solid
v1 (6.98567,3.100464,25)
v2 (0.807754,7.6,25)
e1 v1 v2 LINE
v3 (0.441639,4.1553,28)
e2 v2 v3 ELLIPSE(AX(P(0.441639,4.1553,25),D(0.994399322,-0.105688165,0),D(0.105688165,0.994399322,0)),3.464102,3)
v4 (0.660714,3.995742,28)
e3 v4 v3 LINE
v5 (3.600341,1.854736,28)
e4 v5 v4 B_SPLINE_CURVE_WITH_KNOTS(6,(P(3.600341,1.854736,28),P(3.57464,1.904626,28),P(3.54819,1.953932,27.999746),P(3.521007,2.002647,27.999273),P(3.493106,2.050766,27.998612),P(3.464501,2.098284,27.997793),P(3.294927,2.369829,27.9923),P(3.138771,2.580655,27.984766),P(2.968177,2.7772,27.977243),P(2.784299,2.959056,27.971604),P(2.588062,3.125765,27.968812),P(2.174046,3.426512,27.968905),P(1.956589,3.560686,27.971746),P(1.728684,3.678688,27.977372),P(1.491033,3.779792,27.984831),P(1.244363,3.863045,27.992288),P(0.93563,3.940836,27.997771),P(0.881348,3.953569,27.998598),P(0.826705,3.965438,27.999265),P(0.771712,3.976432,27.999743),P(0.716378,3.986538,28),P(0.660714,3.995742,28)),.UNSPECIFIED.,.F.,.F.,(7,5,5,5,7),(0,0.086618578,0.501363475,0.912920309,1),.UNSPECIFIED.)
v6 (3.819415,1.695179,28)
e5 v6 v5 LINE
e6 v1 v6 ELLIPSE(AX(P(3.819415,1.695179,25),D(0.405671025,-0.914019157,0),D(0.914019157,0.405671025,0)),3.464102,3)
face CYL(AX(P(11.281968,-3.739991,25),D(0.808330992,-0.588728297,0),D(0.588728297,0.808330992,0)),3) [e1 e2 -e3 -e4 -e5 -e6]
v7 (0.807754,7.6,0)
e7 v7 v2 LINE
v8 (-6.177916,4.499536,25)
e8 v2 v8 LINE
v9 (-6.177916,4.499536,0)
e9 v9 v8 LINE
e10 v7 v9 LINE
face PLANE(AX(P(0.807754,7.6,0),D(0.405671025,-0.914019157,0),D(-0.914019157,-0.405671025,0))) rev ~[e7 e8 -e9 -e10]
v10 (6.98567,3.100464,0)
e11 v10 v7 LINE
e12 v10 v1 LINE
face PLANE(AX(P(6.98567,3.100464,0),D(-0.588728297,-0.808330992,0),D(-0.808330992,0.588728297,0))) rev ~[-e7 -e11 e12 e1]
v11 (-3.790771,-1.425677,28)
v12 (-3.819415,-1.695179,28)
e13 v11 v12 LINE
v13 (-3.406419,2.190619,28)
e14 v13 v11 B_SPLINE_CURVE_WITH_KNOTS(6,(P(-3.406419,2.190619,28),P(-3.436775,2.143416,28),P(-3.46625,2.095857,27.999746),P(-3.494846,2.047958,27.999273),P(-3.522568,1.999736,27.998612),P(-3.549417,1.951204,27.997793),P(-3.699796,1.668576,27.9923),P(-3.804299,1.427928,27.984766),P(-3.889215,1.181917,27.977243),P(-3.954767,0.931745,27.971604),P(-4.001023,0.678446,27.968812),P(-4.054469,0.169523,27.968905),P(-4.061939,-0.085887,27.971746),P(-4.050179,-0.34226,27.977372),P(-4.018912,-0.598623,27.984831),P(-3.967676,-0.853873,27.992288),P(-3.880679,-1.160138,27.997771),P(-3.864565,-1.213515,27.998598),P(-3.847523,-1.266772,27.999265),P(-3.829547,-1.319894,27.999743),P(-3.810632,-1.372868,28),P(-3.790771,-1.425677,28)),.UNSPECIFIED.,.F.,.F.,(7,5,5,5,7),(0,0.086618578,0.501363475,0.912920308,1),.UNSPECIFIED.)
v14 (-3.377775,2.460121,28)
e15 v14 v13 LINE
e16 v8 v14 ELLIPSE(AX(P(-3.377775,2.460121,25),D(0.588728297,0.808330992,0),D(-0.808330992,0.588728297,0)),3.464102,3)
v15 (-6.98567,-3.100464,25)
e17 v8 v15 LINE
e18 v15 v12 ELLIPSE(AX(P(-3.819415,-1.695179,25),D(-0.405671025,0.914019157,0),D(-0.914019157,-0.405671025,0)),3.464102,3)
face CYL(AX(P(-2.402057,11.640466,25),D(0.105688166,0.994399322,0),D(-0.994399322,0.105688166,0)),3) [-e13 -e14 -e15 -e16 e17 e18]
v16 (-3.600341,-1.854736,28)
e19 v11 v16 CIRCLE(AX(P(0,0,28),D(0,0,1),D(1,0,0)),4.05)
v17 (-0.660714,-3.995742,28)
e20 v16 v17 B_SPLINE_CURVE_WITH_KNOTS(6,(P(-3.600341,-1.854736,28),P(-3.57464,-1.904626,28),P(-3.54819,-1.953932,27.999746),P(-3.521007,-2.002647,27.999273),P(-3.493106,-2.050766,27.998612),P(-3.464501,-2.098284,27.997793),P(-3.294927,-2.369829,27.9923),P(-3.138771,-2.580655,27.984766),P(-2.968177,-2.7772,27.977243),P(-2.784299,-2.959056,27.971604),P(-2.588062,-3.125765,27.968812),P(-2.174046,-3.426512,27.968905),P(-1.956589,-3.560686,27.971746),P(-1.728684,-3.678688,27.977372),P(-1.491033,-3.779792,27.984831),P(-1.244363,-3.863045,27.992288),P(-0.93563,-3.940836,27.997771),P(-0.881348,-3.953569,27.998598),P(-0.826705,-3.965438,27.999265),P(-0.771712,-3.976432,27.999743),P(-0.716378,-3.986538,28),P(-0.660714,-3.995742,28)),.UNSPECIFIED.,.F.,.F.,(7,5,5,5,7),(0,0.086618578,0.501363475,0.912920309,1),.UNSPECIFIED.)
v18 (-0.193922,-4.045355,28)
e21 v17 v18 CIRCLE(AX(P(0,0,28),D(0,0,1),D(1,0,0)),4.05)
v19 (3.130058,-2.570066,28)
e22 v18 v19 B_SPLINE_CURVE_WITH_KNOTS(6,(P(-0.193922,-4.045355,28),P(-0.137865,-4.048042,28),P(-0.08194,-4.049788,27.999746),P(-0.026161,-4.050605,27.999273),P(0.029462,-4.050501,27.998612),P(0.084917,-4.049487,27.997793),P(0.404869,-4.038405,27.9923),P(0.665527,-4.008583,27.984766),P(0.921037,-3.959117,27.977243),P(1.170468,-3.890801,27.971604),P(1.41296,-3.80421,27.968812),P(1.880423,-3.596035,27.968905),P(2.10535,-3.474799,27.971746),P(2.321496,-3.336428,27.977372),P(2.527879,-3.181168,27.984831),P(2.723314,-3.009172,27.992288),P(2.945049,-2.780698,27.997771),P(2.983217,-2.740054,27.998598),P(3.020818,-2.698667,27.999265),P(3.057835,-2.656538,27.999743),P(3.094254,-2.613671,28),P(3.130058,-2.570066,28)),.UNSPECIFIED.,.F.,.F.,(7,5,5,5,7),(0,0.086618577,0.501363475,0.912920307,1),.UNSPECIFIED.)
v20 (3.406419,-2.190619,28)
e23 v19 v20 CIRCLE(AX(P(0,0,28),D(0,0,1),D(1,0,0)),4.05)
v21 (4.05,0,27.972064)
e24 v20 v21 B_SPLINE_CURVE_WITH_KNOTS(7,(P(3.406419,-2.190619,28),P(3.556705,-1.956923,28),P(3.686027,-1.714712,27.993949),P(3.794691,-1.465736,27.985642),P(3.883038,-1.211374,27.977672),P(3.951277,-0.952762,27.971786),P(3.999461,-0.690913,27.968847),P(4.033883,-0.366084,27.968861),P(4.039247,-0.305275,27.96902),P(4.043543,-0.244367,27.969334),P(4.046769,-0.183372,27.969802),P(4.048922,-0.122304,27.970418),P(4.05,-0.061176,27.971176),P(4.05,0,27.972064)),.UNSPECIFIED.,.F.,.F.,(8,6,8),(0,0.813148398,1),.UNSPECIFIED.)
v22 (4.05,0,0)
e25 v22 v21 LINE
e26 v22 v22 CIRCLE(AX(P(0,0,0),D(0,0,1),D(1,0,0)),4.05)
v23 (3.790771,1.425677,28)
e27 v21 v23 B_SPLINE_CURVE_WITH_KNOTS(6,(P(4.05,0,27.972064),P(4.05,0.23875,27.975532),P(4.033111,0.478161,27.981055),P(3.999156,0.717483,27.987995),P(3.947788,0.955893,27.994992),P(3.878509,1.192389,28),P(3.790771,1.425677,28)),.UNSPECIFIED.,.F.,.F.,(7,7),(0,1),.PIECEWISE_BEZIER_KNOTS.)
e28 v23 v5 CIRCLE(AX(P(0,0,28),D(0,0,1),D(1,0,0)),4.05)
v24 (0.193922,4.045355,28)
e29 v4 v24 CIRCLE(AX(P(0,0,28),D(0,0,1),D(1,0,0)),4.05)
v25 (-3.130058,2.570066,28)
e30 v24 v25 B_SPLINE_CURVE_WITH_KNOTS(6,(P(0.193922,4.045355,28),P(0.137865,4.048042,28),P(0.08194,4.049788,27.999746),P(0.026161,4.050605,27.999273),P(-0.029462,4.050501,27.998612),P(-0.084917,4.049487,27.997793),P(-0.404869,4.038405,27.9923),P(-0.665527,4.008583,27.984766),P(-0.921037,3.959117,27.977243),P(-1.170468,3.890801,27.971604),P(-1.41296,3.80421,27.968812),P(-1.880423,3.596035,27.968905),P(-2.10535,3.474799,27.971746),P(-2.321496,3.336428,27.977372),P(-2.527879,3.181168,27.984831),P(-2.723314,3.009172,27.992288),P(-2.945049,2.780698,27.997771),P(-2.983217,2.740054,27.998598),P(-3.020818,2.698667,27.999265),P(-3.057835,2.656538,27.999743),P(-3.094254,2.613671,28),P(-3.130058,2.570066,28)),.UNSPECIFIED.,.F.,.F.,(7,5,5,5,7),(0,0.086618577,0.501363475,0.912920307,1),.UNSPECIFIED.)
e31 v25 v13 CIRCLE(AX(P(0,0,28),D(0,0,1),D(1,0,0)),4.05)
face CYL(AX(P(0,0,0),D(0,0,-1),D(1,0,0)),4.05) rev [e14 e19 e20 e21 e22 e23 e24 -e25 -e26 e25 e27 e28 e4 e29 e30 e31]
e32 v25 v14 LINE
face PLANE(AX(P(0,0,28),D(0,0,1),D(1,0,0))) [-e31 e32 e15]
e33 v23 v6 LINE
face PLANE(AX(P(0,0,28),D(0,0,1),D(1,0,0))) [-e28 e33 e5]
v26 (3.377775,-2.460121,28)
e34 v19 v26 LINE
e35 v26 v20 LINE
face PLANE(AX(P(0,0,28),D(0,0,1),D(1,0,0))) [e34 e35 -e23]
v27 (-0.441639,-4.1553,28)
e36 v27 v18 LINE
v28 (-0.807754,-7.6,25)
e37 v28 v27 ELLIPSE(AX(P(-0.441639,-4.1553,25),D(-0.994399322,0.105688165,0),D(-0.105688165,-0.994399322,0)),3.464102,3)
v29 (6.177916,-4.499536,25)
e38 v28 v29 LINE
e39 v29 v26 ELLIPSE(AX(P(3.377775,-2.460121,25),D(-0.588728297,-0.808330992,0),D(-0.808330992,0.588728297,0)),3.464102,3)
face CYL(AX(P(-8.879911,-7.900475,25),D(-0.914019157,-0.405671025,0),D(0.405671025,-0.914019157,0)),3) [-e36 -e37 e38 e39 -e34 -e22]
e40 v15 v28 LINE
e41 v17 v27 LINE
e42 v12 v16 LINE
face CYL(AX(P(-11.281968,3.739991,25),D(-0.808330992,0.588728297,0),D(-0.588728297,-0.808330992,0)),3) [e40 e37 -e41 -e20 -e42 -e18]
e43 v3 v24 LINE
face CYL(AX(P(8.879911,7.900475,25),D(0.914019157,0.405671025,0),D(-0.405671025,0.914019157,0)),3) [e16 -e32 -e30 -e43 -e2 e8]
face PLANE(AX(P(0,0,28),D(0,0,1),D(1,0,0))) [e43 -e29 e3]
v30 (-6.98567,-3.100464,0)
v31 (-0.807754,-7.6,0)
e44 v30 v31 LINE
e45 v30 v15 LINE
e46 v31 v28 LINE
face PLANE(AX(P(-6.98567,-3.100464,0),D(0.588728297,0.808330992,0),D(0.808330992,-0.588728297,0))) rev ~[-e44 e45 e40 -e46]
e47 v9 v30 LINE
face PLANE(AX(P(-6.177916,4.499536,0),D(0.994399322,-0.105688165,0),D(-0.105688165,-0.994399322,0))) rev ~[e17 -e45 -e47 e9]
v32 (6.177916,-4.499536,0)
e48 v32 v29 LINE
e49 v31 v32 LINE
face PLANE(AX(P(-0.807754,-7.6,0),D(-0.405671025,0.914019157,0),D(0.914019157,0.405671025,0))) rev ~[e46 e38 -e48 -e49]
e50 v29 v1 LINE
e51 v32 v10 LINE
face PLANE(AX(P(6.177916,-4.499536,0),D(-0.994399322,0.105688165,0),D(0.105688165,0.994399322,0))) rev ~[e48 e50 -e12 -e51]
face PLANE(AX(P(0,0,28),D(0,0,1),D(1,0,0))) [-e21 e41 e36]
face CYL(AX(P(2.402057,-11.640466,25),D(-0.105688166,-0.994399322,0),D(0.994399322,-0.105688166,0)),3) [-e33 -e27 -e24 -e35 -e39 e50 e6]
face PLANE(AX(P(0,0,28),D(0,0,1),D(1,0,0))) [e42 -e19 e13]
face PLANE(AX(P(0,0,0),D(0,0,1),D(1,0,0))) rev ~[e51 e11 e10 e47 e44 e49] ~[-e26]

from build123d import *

# Parameters (mm, degrees)
F0_R         = 4.05
F1_DEPTH     = 28
F2_T1_DEPTH  = 22.6428048889
F2_T3_DEPTH  = 22.6428048889
F2_T5_DEPTH  = 22.6428048889
F2_T7_DEPTH  = 22.6428048889
F2_T9_DEPTH  = 22.6428048889
F2_T11_DEPTH = 22.6428048889


# Not quite as in the source:
# - a fillet or chamfer that OpenCascade refuses, or shapes differently, is made with other operations: its cross-section is extruded or revolved along the edge and cut away or added


with BuildPart() as f1:
    # F0 (on Top) → F1 (new body)
    with BuildSketch(Plane.XY):
        Polygon((6.1779160549, -4.4995355079), (6.9856700826, 3.1004644921), (0.8077540276, 7.6), (-6.1779160549, 4.4995355079), (-6.9856700826, -3.1004644921), (-0.8077540276, -7.6), align=None)
        Circle(F0_R, mode=Mode.SUBTRACT)
    extrude(amount=F1_DEPTH)

    # F2: fillet of radius 3 on 6 edges, made by hand

    # F2_s2 → F2_t1 (cut)
    with BuildSketch(Plane(origin=(-10.3479787197, -4.5927649325, 0), x_dir=(0, 0, 1), z_dir=(0.9140191571, 0.4056710249, 0))):
        with BuildLine():
            ThreePointArc((25, 6.6188631899), (27.1213203436, 5.7401835335), (28, 3.6188631899))
            Line((28, 3.6188631899), (28, 6.6188631899))
            Line((28, 6.6188631899), (25, 6.6188631899))
        make_face()
    extrude(amount=F2_T1_DEPTH, mode=Mode.SUBTRACT)

    # F2_s4 → F2_t3 (cut)
    with BuildSketch(Plane(origin=(-9.151440465, 6.6652299829, 0), x_dir=(0, 0, 1), z_dir=(0.8083309917, -0.5887282972, 0))):
        with BuildLine():
            ThreePointArc((25, 6.6188631899), (27.1213203436, 5.7401835335), (28, 3.6188631899))
            Line((28, 3.6188631899), (28, 6.6188631899))
            Line((28, 6.6188631899), (25, 6.6188631899))
        make_face()
    extrude(amount=F2_T3_DEPTH, mode=Mode.SUBTRACT)

    # F2_s6 → F2_t5 (cut)
    with BuildSketch(Plane(origin=(1.1965382547, 11.2579949153, 0), x_dir=(0, 0, 1), z_dir=(-0.1056881655, -0.994399322, 0))):
        with BuildLine():
            ThreePointArc((25, 6.6188631899), (27.1213203436, 5.7401835335), (28, 3.6188631899))
            Line((28, 3.6188631899), (28, 6.6188631899))
            Line((28, 6.6188631899), (25, 6.6188631899))
        make_face()
    extrude(amount=F2_T5_DEPTH, mode=Mode.SUBTRACT)

    # F2_s8 → F2_t7 (cut)
    with BuildSketch(Plane(origin=(10.3479787197, 4.5927649325, 0), x_dir=(0, 0, 1), z_dir=(-0.9140191571, -0.4056710249, 0))):
        with BuildLine():
            ThreePointArc((25, 6.6188631899), (27.1213203436, 5.7401835335), (28, 3.6188631899))
            Line((28, 3.6188631899), (28, 6.6188631899))
            Line((28, 6.6188631899), (25, 6.6188631899))
        make_face()
    extrude(amount=F2_T7_DEPTH, mode=Mode.SUBTRACT)

    # F2_s10 → F2_t9 (cut)
    with BuildSketch(Plane(origin=(9.151440465, -6.6652299829, 0), x_dir=(0, 0, 1), z_dir=(-0.8083309917, 0.5887282972, 0))):
        with BuildLine():
            ThreePointArc((25, 6.6188631899), (27.1213203436, 5.7401835335), (28, 3.6188631899))
            Line((28, 3.6188631899), (28, 6.6188631899))
            Line((28, 6.6188631899), (25, 6.6188631899))
        make_face()
    extrude(amount=F2_T9_DEPTH, mode=Mode.SUBTRACT)

    # F2_s12 → F2_t11 (cut)
    with BuildSketch(Plane(origin=(-1.1965382547, -11.2579949153, 0), x_dir=(0, 0, 1), z_dir=(0.1056881655, 0.994399322, 0))):
        with BuildLine():
            ThreePointArc((25, 6.6188631899), (27.1213203436, 5.7401835335), (28, 3.6188631899))
            Line((28, 3.6188631899), (28, 6.6188631899))
            Line((28, 6.6188631899), (25, 6.6188631899))
        make_face()
    extrude(amount=F2_T11_DEPTH, mode=Mode.SUBTRACT)


solid = f1.part
